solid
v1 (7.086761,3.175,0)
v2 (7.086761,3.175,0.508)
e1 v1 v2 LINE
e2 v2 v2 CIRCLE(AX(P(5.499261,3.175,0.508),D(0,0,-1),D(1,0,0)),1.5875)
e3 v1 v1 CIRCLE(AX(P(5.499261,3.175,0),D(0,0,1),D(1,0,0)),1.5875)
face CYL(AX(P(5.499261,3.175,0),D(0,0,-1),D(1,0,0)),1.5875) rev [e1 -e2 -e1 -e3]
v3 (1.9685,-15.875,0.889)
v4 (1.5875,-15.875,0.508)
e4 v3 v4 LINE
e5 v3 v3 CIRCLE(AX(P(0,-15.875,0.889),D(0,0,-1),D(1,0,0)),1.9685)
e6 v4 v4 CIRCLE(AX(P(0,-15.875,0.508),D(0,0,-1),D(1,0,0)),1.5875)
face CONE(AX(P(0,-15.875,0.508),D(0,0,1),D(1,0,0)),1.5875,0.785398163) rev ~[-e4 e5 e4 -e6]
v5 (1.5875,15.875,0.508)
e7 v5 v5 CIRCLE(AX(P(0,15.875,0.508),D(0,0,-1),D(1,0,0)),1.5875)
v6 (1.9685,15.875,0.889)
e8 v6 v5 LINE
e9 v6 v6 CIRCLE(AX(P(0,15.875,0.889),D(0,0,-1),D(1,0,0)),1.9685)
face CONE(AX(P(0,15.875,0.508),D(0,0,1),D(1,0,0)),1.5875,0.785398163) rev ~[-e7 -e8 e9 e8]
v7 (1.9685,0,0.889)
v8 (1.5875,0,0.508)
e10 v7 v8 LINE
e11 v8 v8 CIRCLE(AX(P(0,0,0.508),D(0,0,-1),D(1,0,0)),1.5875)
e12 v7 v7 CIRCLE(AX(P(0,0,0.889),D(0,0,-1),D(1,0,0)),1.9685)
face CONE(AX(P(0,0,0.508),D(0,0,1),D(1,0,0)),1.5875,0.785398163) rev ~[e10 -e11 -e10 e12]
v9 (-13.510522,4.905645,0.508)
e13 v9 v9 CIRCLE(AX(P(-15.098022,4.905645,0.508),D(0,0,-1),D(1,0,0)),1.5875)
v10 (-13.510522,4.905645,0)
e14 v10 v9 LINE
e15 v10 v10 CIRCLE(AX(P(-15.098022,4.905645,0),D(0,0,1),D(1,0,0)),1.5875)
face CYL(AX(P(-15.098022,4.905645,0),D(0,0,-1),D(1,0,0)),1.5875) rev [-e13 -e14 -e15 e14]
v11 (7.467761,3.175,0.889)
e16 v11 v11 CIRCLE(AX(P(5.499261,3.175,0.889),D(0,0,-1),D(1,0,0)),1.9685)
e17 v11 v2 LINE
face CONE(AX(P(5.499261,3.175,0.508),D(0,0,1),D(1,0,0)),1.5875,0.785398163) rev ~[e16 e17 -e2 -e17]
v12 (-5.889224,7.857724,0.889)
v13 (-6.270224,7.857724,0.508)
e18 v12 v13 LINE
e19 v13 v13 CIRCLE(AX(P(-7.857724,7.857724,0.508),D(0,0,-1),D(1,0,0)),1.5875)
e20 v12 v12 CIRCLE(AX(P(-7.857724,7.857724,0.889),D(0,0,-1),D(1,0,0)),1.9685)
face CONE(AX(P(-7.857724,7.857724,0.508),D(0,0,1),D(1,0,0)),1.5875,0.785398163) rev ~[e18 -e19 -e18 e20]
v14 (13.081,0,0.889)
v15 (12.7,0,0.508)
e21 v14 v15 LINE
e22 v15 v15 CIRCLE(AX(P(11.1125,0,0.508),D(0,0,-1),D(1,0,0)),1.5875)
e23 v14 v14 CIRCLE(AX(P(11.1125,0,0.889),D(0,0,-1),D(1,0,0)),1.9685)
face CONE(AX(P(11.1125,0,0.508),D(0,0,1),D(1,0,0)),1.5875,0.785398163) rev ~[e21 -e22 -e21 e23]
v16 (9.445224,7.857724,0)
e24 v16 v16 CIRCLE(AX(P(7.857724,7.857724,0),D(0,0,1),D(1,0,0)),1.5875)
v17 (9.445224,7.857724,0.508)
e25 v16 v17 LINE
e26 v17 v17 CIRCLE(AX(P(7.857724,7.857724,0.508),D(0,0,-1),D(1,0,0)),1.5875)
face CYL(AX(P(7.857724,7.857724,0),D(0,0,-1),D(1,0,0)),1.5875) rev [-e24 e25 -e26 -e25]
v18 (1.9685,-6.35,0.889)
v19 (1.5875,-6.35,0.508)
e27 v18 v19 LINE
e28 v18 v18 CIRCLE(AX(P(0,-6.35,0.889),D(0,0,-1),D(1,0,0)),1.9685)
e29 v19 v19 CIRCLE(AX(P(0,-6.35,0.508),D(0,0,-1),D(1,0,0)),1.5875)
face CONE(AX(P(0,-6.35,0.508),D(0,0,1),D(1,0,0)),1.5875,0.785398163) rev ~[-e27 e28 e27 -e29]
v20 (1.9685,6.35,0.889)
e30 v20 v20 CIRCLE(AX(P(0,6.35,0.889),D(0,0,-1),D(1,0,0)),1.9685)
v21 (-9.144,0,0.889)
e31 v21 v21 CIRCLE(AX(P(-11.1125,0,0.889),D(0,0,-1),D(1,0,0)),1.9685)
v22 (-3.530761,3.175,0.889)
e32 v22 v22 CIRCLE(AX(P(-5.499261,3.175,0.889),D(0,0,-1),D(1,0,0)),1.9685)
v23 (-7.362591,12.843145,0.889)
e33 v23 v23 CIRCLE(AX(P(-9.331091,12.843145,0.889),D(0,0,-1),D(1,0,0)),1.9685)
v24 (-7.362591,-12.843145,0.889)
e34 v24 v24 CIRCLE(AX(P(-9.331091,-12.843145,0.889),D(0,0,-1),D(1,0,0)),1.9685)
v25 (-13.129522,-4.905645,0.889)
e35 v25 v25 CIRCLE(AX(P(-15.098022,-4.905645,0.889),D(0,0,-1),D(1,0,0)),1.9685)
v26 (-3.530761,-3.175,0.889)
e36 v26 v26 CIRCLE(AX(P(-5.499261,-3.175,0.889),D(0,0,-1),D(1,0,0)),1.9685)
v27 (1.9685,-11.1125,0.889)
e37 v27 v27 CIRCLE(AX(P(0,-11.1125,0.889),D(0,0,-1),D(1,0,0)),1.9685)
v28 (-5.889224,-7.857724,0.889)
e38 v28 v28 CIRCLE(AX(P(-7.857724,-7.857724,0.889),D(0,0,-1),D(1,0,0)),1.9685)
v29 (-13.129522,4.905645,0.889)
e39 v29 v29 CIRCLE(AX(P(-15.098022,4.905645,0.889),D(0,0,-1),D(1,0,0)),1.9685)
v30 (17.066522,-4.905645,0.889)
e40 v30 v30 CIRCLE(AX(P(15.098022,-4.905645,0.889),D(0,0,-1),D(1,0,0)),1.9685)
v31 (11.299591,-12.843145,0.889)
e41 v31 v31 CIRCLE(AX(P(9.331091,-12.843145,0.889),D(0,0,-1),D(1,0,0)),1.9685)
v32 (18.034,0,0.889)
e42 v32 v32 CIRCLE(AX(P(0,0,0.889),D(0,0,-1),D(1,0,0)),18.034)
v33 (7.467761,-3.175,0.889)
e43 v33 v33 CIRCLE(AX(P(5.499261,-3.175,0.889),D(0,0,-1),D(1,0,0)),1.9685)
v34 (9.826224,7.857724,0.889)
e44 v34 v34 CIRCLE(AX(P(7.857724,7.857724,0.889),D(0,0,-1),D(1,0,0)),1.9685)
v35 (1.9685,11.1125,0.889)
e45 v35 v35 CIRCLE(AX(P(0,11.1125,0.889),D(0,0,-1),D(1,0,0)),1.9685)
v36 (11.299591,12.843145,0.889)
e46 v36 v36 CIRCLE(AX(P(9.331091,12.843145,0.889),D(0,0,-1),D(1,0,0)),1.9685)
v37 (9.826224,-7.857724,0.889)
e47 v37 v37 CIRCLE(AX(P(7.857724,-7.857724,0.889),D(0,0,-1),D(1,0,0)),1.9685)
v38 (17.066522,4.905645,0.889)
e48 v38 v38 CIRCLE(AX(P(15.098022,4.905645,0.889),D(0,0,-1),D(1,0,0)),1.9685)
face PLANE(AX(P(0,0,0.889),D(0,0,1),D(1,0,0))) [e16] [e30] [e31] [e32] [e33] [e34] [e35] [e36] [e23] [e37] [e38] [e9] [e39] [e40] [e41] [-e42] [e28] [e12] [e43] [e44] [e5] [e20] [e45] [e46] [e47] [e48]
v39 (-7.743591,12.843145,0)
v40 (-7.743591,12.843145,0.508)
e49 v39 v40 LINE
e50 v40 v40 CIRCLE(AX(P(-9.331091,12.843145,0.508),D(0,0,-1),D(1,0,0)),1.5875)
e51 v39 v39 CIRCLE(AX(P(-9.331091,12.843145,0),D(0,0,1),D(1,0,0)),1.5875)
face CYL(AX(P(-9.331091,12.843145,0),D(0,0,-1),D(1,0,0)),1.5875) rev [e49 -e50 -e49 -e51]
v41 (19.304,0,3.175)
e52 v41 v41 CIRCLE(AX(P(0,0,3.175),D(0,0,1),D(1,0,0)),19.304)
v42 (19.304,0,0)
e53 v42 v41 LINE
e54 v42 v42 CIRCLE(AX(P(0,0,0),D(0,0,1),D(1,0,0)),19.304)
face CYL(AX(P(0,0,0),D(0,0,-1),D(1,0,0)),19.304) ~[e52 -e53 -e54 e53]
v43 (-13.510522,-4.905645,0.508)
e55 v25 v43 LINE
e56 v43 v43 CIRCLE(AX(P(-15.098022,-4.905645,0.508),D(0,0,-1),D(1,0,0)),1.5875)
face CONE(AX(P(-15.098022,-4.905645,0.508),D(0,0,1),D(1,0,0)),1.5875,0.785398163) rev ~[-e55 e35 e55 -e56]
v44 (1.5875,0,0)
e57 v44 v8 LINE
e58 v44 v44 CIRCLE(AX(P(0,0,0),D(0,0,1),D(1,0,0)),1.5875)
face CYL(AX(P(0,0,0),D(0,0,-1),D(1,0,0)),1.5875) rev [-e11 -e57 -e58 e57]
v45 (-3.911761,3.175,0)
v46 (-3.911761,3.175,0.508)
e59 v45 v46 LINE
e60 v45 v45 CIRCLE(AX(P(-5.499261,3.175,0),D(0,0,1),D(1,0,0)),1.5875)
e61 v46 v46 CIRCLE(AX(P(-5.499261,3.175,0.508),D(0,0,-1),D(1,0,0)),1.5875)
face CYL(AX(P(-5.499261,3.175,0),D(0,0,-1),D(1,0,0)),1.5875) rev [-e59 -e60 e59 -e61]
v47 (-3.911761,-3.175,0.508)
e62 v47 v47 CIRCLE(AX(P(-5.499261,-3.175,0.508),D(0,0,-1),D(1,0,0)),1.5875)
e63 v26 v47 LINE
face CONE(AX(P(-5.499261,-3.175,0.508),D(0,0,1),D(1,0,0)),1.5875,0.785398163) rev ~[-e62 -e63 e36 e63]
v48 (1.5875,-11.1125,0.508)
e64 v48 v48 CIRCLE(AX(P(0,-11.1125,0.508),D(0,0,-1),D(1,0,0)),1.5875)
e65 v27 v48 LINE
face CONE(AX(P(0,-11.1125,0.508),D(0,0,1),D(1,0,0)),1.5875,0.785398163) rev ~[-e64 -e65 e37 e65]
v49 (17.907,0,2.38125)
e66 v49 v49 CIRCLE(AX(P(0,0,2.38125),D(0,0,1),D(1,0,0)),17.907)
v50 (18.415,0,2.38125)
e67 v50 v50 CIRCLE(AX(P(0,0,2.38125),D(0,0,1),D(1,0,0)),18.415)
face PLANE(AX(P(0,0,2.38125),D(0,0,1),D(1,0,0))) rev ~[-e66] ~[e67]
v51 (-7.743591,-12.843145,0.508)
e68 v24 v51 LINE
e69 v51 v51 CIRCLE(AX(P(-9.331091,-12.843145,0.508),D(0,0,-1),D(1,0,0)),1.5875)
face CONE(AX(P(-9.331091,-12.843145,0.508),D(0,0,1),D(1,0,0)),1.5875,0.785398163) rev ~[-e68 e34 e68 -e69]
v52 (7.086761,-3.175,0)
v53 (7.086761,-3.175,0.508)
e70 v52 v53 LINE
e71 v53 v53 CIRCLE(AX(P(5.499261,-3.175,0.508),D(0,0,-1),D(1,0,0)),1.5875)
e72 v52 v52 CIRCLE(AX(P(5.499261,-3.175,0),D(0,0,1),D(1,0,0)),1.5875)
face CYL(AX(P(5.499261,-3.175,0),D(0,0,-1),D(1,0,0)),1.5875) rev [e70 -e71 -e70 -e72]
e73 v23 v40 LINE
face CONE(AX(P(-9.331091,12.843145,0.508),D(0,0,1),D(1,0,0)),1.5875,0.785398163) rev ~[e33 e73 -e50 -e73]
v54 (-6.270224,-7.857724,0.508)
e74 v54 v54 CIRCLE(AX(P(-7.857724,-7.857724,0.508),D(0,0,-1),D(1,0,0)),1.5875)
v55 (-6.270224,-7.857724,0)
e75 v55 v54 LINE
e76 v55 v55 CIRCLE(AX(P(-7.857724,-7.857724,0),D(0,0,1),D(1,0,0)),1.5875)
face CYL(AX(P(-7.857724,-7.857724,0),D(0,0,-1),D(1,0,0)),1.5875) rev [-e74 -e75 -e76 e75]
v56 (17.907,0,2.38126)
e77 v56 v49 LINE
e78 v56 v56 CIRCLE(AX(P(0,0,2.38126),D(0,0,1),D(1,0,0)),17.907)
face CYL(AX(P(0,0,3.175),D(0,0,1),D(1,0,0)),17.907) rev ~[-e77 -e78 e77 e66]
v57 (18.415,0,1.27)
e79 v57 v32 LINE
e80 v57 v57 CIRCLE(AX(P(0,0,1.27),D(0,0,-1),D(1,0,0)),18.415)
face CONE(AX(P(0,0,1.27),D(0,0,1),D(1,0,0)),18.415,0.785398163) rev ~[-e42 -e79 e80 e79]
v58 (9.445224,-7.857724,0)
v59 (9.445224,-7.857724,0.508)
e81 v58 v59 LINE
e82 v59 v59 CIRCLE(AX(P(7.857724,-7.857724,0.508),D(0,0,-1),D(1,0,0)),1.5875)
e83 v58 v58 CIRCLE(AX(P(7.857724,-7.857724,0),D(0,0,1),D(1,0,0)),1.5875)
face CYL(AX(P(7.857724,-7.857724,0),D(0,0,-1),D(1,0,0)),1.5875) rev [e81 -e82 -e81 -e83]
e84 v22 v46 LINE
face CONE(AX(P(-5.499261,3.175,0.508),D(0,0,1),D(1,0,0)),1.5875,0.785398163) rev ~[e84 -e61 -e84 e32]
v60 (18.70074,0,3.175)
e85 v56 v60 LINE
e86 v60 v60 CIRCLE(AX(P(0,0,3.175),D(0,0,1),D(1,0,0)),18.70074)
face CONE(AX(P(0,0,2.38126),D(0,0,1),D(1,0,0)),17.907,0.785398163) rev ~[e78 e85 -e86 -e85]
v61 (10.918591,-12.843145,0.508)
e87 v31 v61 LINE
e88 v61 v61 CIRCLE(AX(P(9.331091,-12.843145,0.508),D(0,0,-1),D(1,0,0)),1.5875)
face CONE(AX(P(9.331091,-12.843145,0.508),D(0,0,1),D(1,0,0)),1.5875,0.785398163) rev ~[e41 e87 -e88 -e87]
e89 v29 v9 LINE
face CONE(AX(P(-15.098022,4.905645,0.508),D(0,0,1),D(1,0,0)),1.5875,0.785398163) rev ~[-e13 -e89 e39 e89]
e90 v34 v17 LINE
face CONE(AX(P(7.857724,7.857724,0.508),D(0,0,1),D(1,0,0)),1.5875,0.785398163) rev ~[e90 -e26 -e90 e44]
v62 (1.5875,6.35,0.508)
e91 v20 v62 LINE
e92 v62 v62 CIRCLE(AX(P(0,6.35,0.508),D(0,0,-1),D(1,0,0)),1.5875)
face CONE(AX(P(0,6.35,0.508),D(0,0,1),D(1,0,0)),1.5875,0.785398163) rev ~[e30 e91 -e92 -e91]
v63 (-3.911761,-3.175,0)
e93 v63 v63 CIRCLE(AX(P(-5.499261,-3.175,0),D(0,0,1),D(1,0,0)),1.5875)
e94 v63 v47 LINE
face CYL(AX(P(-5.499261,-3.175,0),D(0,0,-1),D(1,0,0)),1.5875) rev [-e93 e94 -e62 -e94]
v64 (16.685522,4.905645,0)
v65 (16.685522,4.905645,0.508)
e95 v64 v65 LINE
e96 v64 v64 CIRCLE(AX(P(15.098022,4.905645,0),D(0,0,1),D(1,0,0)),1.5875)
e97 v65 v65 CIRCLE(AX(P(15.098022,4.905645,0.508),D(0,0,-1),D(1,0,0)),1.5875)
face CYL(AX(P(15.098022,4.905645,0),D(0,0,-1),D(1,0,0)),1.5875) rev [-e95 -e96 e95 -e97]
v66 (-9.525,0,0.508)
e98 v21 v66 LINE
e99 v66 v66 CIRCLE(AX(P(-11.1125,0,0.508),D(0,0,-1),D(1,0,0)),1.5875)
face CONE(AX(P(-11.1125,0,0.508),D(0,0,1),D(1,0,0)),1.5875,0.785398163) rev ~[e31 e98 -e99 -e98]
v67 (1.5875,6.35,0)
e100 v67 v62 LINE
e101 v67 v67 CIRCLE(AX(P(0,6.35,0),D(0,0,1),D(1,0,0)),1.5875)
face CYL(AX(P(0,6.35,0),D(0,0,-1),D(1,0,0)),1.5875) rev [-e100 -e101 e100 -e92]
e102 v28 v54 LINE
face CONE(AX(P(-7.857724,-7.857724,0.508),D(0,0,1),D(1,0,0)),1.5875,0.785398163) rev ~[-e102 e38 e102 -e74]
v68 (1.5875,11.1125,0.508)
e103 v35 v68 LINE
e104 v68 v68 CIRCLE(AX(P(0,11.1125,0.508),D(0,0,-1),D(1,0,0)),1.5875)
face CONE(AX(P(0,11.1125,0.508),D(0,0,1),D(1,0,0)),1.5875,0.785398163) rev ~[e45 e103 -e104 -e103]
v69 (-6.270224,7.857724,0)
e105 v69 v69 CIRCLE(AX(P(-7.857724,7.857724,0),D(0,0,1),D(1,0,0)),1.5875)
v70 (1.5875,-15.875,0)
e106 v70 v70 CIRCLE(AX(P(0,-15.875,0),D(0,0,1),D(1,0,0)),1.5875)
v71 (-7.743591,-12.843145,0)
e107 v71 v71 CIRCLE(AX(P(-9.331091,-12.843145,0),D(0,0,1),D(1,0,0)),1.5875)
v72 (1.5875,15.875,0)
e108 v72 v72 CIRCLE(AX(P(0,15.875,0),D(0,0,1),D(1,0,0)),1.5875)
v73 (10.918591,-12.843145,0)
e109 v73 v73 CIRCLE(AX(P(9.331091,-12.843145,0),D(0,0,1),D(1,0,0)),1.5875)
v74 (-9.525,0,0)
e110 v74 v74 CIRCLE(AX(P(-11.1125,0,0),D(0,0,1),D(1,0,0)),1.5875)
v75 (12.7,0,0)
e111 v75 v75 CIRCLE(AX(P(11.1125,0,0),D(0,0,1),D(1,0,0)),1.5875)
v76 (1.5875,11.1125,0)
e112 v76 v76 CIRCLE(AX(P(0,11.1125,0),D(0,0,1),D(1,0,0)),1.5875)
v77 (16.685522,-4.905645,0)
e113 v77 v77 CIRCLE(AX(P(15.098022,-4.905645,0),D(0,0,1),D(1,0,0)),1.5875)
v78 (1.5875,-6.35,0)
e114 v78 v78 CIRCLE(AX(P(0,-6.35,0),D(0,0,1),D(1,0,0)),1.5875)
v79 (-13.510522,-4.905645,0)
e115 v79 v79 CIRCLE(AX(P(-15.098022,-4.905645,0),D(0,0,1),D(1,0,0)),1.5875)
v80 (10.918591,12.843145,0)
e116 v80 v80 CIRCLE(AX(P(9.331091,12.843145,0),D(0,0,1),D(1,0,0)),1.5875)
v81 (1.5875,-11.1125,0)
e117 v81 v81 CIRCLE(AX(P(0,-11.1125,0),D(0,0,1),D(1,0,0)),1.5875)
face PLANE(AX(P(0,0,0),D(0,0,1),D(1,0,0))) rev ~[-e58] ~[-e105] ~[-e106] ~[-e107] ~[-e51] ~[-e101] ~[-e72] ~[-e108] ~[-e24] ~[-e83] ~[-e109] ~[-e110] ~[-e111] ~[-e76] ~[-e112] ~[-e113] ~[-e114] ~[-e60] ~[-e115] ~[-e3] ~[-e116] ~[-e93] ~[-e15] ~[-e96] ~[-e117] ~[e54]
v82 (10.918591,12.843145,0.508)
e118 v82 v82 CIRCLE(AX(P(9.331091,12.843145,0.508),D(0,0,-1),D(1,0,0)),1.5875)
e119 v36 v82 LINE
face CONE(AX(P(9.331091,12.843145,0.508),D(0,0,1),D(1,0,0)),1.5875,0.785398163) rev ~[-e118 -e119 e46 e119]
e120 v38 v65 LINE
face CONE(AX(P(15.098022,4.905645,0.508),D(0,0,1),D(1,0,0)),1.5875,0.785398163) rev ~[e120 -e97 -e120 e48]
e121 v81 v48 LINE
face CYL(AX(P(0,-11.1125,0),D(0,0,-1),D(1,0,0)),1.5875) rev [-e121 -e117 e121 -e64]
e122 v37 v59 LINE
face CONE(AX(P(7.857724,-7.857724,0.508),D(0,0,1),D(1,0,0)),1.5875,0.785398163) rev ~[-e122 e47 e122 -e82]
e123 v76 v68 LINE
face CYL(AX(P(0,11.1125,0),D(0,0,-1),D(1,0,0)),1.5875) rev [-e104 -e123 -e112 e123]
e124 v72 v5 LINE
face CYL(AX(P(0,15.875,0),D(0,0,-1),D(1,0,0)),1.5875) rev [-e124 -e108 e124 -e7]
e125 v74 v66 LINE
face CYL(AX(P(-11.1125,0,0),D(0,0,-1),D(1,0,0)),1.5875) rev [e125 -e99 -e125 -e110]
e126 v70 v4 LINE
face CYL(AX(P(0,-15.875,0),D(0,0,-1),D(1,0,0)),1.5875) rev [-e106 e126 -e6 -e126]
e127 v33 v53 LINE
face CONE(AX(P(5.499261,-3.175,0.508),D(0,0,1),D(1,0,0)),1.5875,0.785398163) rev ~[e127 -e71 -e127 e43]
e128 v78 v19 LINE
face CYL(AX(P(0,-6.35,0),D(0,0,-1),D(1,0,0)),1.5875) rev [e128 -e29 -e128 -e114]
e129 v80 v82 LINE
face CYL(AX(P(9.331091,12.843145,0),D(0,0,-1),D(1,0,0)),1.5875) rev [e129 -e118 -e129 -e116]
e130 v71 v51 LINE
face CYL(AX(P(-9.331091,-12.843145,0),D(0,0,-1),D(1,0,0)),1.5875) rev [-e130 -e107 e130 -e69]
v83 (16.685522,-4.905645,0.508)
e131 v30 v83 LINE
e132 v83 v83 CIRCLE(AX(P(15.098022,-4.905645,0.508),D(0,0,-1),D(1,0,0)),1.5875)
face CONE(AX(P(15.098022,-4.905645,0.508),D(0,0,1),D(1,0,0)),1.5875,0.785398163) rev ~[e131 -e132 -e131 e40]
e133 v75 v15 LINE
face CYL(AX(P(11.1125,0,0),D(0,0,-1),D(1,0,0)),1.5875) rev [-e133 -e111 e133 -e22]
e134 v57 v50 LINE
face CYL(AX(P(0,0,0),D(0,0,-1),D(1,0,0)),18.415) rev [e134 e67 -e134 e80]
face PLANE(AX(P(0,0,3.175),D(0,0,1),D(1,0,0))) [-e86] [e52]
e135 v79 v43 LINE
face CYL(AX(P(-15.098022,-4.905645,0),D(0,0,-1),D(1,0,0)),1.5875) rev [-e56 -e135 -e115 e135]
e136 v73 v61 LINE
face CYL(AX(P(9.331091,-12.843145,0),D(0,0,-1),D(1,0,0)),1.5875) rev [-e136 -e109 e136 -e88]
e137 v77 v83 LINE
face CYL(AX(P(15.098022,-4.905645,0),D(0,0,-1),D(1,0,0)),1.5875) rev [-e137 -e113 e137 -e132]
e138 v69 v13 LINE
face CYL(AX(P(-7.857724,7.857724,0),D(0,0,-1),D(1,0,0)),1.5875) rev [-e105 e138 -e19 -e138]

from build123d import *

# Parameters (mm, degrees)
F0_R     = 19.304
F0_R_2   = 1.5875
F1_DEPTH = 3.175
F2_T     = -0.889
F3_DEPTH = 3.176
F4_R     = 18.415
F4_R_2   = 17.907
F5_DEPTH = 0.79375
F6_SIZE  = 0.79374
F7_SIZE  = 0.381


# Not quite as in the source:
# - a fillet or chamfer is up to 0.001 mm smaller than in the source, because OpenCascade refuses the exact size
# - a feature names something its author has since deleted; it is built from what else it names


with BuildPart() as f1:
    # F0 (on Top) → F1 (new body)
    with BuildSketch(Plane.XY):
        Circle(F0_R)
        with Locations((-9.3310908801, -12.8431447857)):
            Circle(F0_R_2, mode=Mode.SUBTRACT)
        with Locations((-15.0980221962, -4.9056447857)):
            Circle(F0_R_2, mode=Mode.SUBTRACT)
        with Locations((-7.8577241059, -7.8577241059)):
            Circle(F0_R_2, mode=Mode.SUBTRACT)
        with Locations((-5.499261314, -3.175)):
            Circle(F0_R_2, mode=Mode.SUBTRACT)
        with Locations((0, -15.875)):
            Circle(F0_R_2, mode=Mode.SUBTRACT)
        with Locations((0, -11.1125)):
            Circle(F0_R_2, mode=Mode.SUBTRACT)
        with Locations((9.3310908801, -12.8431447857)):
            Circle(F0_R_2, mode=Mode.SUBTRACT)
        with Locations((0, -6.35)):
            Circle(F0_R_2, mode=Mode.SUBTRACT)
        with Locations((7.8577241059, -7.8577241059)):
            Circle(F0_R_2, mode=Mode.SUBTRACT)
        with Locations((5.499261314, -3.175)):
            Circle(F0_R_2, mode=Mode.SUBTRACT)
        with Locations((15.0980221962, -4.9056447857)):
            Circle(F0_R_2, mode=Mode.SUBTRACT)
        with Locations((-11.1125, 0)):
            Circle(F0_R_2, mode=Mode.SUBTRACT)
        with Locations((-15.0980221962, 4.9056447857)):
            Circle(F0_R_2, mode=Mode.SUBTRACT)
        with Locations((-5.499261314, 3.175)):
            Circle(F0_R_2, mode=Mode.SUBTRACT)
        with Locations((-7.8577241059, 7.8577241059)):
            Circle(F0_R_2, mode=Mode.SUBTRACT)
        with Locations((-9.3310908801, 12.8431447857)):
            Circle(F0_R_2, mode=Mode.SUBTRACT)
        Circle(F0_R_2, mode=Mode.SUBTRACT)
        with Locations((5.499261314, 3.175)):
            Circle(F0_R_2, mode=Mode.SUBTRACT)
        with Locations((0, 6.35)):
            Circle(F0_R_2, mode=Mode.SUBTRACT)
        with Locations((7.8577241059, 7.8577241059)):
            Circle(F0_R_2, mode=Mode.SUBTRACT)
        with Locations((11.1125, 0)):
            Circle(F0_R_2, mode=Mode.SUBTRACT)
        with Locations((15.0980221962, 4.9056447857)):
            Circle(F0_R_2, mode=Mode.SUBTRACT)
        with Locations((0, 11.1125)):
            Circle(F0_R_2, mode=Mode.SUBTRACT)
        with Locations((9.3310908801, 12.8431447857)):
            Circle(F0_R_2, mode=Mode.SUBTRACT)
        with Locations((0, 15.875)):
            Circle(F0_R_2, mode=Mode.SUBTRACT)
        Circle(F0_R_2)
        with Locations((5.499261314, 3.175)):
            Circle(F0_R_2)
        with Locations((0, 15.875)):
            Circle(F0_R_2)
        with Locations((0, 11.1125)):
            Circle(F0_R_2)
        with Locations((0, 6.35)):
            Circle(F0_R_2)
        with Locations((-9.3310908801, 12.8431447857)):
            Circle(F0_R_2)
        with Locations((-7.8577241059, 7.8577241059)):
            Circle(F0_R_2)
        with Locations((-15.0980221962, 4.9056447857)):
            Circle(F0_R_2)
        with Locations((-11.1125, 0)):
            Circle(F0_R_2)
        with Locations((-5.499261314, 3.175)):
            Circle(F0_R_2)
        with Locations((-15.0980221962, -4.9056447857)):
            Circle(F0_R_2)
        with Locations((-7.8577241059, -7.8577241059)):
            Circle(F0_R_2)
        with Locations((-5.499261314, -3.175)):
            Circle(F0_R_2)
        with Locations((-9.3310908801, -12.8431447857)):
            Circle(F0_R_2)
        with Locations((0, -11.1125)):
            Circle(F0_R_2)
        with Locations((0, -15.875)):
            Circle(F0_R_2)
        with Locations((0, -6.35)):
            Circle(F0_R_2)
        with Locations((7.8577241059, -7.8577241059)):
            Circle(F0_R_2)
        with Locations((9.3310908801, -12.8431447857)):
            Circle(F0_R_2)
        with Locations((15.0980221962, -4.9056447857)):
            Circle(F0_R_2)
        with Locations((11.1125, 0)):
            Circle(F0_R_2)
        with Locations((5.499261314, -3.175)):
            Circle(F0_R_2)
        with Locations((7.8577241059, 7.8577241059)):
            Circle(F0_R_2)
        with Locations((15.0980221962, 4.9056447857)):
            Circle(F0_R_2)
        with Locations((9.3310908801, 12.8431447857)):
            Circle(F0_R_2)
    extrude(amount=F1_DEPTH)

    # F2
    f2_openings = [f1.faces().sort_by_distance(p)[0] for p in [
        (0, 0, 3.175),
    ]]
    offset(amount=F2_T, openings=f2_openings)

    # F0 (on Top) → F3 (cut, through all)
    with BuildSketch(Plane.XY):
        with Locations((0, -6.35)):
            Circle(F0_R_2)
        with Locations((7.8577241059, -7.8577241059)):
            Circle(F0_R_2)
        with Locations((9.3310908801, -12.8431447857)):
            Circle(F0_R_2)
        with Locations((0, -11.1125)):
            Circle(F0_R_2)
        with Locations((0, -15.875)):
            Circle(F0_R_2)
        with Locations((-9.3310908801, -12.8431447857)):
            Circle(F0_R_2)
        with Locations((-7.8577241059, -7.8577241059)):
            Circle(F0_R_2)
        with Locations((-5.499261314, -3.175)):
            Circle(F0_R_2)
        with Locations((-15.0980221962, -4.9056447857)):
            Circle(F0_R_2)
        with Locations((-11.1125, 0)):
            Circle(F0_R_2)
        with Locations((-5.499261314, 3.175)):
            Circle(F0_R_2)
        with Locations((-15.0980221962, 4.9056447857)):
            Circle(F0_R_2)
        with Locations((-9.3310908801, 12.8431447857)):
            Circle(F0_R_2)
        with Locations((-7.8577241059, 7.8577241059)):
            Circle(F0_R_2)
        with Locations((0, 15.875)):
            Circle(F0_R_2)
        with Locations((0, 11.1125)):
            Circle(F0_R_2)
        with Locations((0, 6.35)):
            Circle(F0_R_2)
        with Locations((5.499261314, 3.175)):
            Circle(F0_R_2)
        with Locations((9.3310908801, 12.8431447857)):
            Circle(F0_R_2)
        with Locations((7.8577241059, 7.8577241059)):
            Circle(F0_R_2)
        with Locations((5.499261314, -3.175)):
            Circle(F0_R_2)
        with Locations((15.0980221962, 4.9056447857)):
            Circle(F0_R_2)
        with Locations((15.0980221962, -4.9056447857)):
            Circle(F0_R_2)
        with Locations((11.1125, 0)):
            Circle(F0_R_2)
        Circle(F0_R_2)
    extrude(amount=F3_DEPTH, mode=Mode.SUBTRACT)

    # F4 (on face) → F5 (join)
    with BuildSketch(Plane.XY.offset(3.175)):
        Circle(F4_R)
        Circle(F4_R_2, mode=Mode.SUBTRACT)
    extrude(amount=-F5_DEPTH)

    # F6 (size 0.79375 in the source; OpenCascade refuses exactly that, so slightly less here)
    f6_edges = [f1.edges().sort_by_distance(p)[0] for p in [
        (-17.907, 0, 3.175),
    ]]
    chamfer(f6_edges, length=F6_SIZE)

    # F7
    f7_edges = [f1.edges().sort_by_distance(p)[0] for p in [
        (-18.415, 0, 0.889),
        (18.415, 0, 1.635125),
        (-10.918591, -12.843145, 0.889),
        (-16.685522, -4.905645, 0.889),
        (-9.445224, -7.857724, 0.889),
        (-7.086761, -3.175, 0.889),
        (-1.5875, -15.875, 0.889),
        (-1.5875, -11.1125, 0.889),
        (7.743591, -12.843145, 0.889),
        (-1.5875, -6.35, 0.889),
        (6.270224, -7.857724, 0.889),
        (3.911761, -3.175, 0.889),
        (13.510522, -4.905645, 0.889),
        (-12.7, 0, 0.889),
        (-16.685522, 4.905645, 0.889),
        (-7.086761, 3.175, 0.889),
        (-9.445224, 7.857724, 0.889),
        (-10.918591, 12.843145, 0.889),
        (-1.5875, 0, 0.889),
        (3.911761, 3.175, 0.889),
        (-1.5875, 6.35, 0.889),
        (6.270224, 7.857724, 0.889),
        (9.525, 0, 0.889),
        (13.510522, 4.905645, 0.889),
        (-1.5875, 11.1125, 0.889),
        (-1.5875, 15.875, 0.889),
        (7.743591, 12.843145, 0.889),
    ]]
    chamfer(f7_edges, length=F7_SIZE)


solid = f1.part
